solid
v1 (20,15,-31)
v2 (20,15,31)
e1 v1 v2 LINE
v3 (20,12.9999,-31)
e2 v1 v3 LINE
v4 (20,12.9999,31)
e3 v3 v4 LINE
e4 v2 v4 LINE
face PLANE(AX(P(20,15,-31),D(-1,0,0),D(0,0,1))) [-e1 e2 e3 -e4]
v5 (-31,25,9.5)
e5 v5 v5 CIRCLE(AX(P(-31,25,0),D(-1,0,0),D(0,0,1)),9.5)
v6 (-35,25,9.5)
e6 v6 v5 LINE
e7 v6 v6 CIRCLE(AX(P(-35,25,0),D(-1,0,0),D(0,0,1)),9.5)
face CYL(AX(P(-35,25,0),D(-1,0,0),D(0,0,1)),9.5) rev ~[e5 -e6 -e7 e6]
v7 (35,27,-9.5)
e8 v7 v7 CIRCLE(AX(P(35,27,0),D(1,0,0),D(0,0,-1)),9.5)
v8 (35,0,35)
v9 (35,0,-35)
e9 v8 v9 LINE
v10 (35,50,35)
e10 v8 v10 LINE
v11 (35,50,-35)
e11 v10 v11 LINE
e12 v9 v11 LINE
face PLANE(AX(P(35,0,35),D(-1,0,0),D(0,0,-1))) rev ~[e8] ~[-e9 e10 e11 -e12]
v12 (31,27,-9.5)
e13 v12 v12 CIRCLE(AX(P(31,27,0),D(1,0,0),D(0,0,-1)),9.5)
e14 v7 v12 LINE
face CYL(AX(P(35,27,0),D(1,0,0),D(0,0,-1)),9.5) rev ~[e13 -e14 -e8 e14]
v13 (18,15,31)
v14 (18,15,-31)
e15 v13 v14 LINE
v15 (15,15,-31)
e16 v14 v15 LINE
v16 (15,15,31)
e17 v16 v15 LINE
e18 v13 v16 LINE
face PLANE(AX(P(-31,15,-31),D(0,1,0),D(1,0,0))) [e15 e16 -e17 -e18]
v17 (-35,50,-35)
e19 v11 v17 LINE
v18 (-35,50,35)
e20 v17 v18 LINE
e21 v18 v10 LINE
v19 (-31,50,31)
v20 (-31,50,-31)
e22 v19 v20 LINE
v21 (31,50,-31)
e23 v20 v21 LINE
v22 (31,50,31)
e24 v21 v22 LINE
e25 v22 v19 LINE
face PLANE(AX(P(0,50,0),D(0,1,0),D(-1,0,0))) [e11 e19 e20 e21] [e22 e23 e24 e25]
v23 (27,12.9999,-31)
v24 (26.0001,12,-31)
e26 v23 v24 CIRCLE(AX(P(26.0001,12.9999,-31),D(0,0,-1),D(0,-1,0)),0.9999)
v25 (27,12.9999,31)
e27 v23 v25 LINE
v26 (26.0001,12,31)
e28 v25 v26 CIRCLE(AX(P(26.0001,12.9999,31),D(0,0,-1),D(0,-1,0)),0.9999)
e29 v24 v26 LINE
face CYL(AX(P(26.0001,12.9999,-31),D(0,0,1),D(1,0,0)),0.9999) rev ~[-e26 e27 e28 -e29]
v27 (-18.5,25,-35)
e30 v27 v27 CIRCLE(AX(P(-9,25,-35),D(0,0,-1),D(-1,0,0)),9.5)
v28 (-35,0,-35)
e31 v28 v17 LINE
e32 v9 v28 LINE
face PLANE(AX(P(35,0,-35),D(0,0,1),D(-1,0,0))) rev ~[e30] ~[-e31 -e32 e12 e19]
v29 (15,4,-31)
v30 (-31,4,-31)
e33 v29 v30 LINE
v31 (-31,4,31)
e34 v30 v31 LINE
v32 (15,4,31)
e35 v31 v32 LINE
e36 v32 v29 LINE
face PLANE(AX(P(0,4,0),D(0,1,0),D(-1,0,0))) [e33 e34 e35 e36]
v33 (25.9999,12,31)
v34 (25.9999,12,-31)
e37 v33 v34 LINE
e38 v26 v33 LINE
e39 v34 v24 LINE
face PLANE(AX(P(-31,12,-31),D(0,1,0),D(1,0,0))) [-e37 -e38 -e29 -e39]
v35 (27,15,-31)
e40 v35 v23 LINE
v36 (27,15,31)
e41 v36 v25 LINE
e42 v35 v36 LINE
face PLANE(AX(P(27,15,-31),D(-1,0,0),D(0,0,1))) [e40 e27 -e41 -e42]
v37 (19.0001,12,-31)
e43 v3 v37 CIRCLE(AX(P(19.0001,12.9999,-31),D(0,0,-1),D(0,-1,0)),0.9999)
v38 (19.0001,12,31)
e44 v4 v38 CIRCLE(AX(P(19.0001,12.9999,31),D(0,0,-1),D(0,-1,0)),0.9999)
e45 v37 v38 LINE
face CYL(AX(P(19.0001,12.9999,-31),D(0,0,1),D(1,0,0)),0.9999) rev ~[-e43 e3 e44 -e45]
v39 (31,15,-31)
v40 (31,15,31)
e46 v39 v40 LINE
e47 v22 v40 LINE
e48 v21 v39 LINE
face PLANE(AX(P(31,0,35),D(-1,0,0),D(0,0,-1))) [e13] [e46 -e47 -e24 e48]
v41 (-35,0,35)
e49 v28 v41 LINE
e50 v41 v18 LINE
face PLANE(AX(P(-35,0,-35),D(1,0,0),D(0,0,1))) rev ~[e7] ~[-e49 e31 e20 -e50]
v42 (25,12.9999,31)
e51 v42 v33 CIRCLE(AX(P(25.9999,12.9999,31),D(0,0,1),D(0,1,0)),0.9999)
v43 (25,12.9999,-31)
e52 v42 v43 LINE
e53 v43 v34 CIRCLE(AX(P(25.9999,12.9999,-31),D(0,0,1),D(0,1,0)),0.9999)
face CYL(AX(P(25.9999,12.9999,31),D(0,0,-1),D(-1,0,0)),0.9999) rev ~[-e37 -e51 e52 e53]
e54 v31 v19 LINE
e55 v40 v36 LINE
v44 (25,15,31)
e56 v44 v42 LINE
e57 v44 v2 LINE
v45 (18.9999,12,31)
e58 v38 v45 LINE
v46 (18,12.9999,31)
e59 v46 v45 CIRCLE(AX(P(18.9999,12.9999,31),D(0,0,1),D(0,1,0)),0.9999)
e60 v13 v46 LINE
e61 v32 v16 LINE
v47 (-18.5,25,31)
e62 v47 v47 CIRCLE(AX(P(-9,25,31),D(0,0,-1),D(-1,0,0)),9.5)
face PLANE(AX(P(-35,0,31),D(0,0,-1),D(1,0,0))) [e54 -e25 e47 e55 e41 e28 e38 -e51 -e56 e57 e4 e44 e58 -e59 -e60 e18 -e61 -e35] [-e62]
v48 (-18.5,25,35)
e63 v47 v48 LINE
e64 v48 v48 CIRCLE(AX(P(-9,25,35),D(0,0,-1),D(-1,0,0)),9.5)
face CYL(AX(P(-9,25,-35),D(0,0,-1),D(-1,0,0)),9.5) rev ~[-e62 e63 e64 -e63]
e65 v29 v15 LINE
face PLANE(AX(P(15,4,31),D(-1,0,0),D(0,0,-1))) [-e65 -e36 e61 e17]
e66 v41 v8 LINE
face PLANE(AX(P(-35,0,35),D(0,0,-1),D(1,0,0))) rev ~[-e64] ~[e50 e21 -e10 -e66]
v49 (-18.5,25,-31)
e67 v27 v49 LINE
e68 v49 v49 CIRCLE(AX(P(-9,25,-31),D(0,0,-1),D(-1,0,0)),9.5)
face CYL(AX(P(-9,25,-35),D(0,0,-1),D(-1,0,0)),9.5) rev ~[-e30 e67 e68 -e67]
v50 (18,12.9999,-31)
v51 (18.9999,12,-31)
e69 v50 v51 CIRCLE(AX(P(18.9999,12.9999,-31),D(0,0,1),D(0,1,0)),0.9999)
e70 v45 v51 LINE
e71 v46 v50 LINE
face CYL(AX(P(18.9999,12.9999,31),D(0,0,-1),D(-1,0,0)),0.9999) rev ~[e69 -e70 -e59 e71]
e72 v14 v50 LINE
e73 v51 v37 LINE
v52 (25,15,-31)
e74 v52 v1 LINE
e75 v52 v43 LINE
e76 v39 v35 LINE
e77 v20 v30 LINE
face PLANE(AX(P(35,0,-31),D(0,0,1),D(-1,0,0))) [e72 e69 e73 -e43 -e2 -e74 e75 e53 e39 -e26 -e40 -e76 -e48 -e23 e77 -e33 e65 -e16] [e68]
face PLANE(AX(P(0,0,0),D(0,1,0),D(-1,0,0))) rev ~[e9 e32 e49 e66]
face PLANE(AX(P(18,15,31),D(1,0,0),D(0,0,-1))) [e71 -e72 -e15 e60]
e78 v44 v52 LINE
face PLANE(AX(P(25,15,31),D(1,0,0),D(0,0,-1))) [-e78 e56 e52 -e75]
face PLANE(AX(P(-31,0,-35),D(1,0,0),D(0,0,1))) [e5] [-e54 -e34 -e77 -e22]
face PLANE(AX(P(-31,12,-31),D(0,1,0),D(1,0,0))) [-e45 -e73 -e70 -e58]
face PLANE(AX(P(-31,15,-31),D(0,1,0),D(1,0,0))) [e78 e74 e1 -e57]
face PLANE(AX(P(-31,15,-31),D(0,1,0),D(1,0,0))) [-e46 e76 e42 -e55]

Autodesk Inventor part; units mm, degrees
ref_plane "YZ Plane" through (0, 0, 0) normal (1, 0, 0) x (0, 1, 0)
ref_plane "XZ Plane" through (0, 0, 0) normal (0, 1, 0) x (-1, 0, 0)
ref_plane "XY Plane" through (0, 0, 0) normal (0, 0, 1) x (1, 0, 0)
sketch "Skizze1" plane through (0, 0, 0) normal (0, 1, 0) x (-1, 0, 0)
  line L0 (35, 35) -> (-35, 35)
  line L1 (-35, 35) -> (-35, -35)
  line L2 (-35, -35) -> (35, -35)
  line L3 (35, -35) -> (35, 35)
  line L4 (0, 35) -> (0, -35) construction
  line L5 (35, 0) -> (-35, 0) construction
  point P0 (0, 0)
  point P1 (0, 0)
  dimension "d0" = 70
  dimension "d1" = 70
extrude "Extrusion1" add sketch "Skizze1" along normal blind 50
shell "Wandung1" thickness 4 removed faces 1 at (11.6667, 50, -11.6667)
sketch "Skizze2" plane through (35, 0, 35) normal (1, 0, 0) x (0, 0, -1)
  circle A0 centre (35, 27) radius 9.5
  line L0 (0, 0) -> (0, 50) construction
  line L1 (0, 0) -> (70, 0) construction
  line L2 (0, 50) -> (70, 0) construction
  line L3 (0, 50) -> (70, 50) construction
  line L4 (70, 50) -> (0, 0) construction
  point P0 (35, 0)
  point P1 (35, 25)
  point P2 (35, 25)
  dimension "d5" = 19
  dimension "d27" = 2
sketch "Skizze3" plane through (35, 0, -35) normal (0, 0, -1) x (-1, 0, 0)
  circle A0 centre (44, 25) radius 9.5
  line L0 (0, 0) -> (0, 50) construction
  line L1 (70, 0) -> (70, 50) construction
  line L2 (0, 50) -> (70, 0) construction
  line L3 (0, 50) -> (70, 50) construction
  line L4 (0, 0) -> (70, 50) construction
  point P0 (35, 0)
  point P1 (35, 25)
  point P2 (35, 25)
  dimension "d6" = 19
  dimension "d11" = 9
extrude "Extrusion2" cut sketch "Skizze3" against normal blind 95.5
extrude "Extrusion3" cut sketch "Skizze2" against normal blind 10
sketch "Skizze4" plane through (-31, 4, -31) normal (0, 1, 0) x (1, 0, 0)
  line L0 (62, -62) -> (0, -62) projected
  line L1 (62, 0) -> (0, 0) projected
  line L2 (62, -62) -> (46, -62)
  line L3 (46, -62) -> (46, 0)
  line L4 (46, 0) -> (62, 0)
  line L5 (62, 0) -> (62, -62)
  point P0 (31, -31)
  dimension "d12" = 16
extrude "Extrusion4" add sketch "Skizze4" along normal blind 11
sketch "Skizze5" plane through (-31, 15, -31) normal (0, 1, 0) x (1, 0, 0)
  line L0 (62, -62) -> (46, -62) projected
  line L1 (0, 0) -> (62, 0) projected
  line L2 (58, -62) -> (56, -62)
  line L3 (56, -62) -> (56, 0)
  line L4 (56, 0) -> (58, 0)
  line L5 (58, 0) -> (58, -62)
  line L6 (51, -62) -> (49, -62)
  line L7 (49, -62) -> (49, 0)
  line L8 (49, 0) -> (51, 0)
  line L9 (51, 0) -> (51, -62)
  line L10 (62, 0) -> (62, -62) projected
  line L11 (46, 0) -> (46, -62) projected
  line L12 (53.5, -62) -> (53.5, 0) construction
  point P0 (31, -31)
  point P1 (51, 0)
  point P2 (49, 0)
  point P3 (58, 0)
  dimension "d15" = 2
  dimension "d19" = 7.5
  dimension "d20" = 5
extrude "Extrusion5" cut sketch "Skizze5" against normal blind 3 contours L0 L3 L1 L5 | L0 L7 L1 L9
fillet "Rundung1" radius 1 4 edges at (27, 12, 0) (25, 12, 0) (20, 12, 0) (18, 12, 0)
sketch "Skizze6" plane through (-35, 0, -35) normal (-1, 0, 0) x (0, 0, 1)
  line L0 (70, 0) -> (70, 50) construction
  line L1 (70, 50) -> (0, 0) construction
  line L2 (0, 0) -> (70, 0) construction
  line L3 (70, 0) -> (0, 50) construction
  circle A0 centre (35, 25) radius 9.5
  point P0 (35, 0)
  dimension "d24" = 19
extrude "Extrusion6" cut sketch "Skizze6" against normal blind 10
properties part number "Hülle"
